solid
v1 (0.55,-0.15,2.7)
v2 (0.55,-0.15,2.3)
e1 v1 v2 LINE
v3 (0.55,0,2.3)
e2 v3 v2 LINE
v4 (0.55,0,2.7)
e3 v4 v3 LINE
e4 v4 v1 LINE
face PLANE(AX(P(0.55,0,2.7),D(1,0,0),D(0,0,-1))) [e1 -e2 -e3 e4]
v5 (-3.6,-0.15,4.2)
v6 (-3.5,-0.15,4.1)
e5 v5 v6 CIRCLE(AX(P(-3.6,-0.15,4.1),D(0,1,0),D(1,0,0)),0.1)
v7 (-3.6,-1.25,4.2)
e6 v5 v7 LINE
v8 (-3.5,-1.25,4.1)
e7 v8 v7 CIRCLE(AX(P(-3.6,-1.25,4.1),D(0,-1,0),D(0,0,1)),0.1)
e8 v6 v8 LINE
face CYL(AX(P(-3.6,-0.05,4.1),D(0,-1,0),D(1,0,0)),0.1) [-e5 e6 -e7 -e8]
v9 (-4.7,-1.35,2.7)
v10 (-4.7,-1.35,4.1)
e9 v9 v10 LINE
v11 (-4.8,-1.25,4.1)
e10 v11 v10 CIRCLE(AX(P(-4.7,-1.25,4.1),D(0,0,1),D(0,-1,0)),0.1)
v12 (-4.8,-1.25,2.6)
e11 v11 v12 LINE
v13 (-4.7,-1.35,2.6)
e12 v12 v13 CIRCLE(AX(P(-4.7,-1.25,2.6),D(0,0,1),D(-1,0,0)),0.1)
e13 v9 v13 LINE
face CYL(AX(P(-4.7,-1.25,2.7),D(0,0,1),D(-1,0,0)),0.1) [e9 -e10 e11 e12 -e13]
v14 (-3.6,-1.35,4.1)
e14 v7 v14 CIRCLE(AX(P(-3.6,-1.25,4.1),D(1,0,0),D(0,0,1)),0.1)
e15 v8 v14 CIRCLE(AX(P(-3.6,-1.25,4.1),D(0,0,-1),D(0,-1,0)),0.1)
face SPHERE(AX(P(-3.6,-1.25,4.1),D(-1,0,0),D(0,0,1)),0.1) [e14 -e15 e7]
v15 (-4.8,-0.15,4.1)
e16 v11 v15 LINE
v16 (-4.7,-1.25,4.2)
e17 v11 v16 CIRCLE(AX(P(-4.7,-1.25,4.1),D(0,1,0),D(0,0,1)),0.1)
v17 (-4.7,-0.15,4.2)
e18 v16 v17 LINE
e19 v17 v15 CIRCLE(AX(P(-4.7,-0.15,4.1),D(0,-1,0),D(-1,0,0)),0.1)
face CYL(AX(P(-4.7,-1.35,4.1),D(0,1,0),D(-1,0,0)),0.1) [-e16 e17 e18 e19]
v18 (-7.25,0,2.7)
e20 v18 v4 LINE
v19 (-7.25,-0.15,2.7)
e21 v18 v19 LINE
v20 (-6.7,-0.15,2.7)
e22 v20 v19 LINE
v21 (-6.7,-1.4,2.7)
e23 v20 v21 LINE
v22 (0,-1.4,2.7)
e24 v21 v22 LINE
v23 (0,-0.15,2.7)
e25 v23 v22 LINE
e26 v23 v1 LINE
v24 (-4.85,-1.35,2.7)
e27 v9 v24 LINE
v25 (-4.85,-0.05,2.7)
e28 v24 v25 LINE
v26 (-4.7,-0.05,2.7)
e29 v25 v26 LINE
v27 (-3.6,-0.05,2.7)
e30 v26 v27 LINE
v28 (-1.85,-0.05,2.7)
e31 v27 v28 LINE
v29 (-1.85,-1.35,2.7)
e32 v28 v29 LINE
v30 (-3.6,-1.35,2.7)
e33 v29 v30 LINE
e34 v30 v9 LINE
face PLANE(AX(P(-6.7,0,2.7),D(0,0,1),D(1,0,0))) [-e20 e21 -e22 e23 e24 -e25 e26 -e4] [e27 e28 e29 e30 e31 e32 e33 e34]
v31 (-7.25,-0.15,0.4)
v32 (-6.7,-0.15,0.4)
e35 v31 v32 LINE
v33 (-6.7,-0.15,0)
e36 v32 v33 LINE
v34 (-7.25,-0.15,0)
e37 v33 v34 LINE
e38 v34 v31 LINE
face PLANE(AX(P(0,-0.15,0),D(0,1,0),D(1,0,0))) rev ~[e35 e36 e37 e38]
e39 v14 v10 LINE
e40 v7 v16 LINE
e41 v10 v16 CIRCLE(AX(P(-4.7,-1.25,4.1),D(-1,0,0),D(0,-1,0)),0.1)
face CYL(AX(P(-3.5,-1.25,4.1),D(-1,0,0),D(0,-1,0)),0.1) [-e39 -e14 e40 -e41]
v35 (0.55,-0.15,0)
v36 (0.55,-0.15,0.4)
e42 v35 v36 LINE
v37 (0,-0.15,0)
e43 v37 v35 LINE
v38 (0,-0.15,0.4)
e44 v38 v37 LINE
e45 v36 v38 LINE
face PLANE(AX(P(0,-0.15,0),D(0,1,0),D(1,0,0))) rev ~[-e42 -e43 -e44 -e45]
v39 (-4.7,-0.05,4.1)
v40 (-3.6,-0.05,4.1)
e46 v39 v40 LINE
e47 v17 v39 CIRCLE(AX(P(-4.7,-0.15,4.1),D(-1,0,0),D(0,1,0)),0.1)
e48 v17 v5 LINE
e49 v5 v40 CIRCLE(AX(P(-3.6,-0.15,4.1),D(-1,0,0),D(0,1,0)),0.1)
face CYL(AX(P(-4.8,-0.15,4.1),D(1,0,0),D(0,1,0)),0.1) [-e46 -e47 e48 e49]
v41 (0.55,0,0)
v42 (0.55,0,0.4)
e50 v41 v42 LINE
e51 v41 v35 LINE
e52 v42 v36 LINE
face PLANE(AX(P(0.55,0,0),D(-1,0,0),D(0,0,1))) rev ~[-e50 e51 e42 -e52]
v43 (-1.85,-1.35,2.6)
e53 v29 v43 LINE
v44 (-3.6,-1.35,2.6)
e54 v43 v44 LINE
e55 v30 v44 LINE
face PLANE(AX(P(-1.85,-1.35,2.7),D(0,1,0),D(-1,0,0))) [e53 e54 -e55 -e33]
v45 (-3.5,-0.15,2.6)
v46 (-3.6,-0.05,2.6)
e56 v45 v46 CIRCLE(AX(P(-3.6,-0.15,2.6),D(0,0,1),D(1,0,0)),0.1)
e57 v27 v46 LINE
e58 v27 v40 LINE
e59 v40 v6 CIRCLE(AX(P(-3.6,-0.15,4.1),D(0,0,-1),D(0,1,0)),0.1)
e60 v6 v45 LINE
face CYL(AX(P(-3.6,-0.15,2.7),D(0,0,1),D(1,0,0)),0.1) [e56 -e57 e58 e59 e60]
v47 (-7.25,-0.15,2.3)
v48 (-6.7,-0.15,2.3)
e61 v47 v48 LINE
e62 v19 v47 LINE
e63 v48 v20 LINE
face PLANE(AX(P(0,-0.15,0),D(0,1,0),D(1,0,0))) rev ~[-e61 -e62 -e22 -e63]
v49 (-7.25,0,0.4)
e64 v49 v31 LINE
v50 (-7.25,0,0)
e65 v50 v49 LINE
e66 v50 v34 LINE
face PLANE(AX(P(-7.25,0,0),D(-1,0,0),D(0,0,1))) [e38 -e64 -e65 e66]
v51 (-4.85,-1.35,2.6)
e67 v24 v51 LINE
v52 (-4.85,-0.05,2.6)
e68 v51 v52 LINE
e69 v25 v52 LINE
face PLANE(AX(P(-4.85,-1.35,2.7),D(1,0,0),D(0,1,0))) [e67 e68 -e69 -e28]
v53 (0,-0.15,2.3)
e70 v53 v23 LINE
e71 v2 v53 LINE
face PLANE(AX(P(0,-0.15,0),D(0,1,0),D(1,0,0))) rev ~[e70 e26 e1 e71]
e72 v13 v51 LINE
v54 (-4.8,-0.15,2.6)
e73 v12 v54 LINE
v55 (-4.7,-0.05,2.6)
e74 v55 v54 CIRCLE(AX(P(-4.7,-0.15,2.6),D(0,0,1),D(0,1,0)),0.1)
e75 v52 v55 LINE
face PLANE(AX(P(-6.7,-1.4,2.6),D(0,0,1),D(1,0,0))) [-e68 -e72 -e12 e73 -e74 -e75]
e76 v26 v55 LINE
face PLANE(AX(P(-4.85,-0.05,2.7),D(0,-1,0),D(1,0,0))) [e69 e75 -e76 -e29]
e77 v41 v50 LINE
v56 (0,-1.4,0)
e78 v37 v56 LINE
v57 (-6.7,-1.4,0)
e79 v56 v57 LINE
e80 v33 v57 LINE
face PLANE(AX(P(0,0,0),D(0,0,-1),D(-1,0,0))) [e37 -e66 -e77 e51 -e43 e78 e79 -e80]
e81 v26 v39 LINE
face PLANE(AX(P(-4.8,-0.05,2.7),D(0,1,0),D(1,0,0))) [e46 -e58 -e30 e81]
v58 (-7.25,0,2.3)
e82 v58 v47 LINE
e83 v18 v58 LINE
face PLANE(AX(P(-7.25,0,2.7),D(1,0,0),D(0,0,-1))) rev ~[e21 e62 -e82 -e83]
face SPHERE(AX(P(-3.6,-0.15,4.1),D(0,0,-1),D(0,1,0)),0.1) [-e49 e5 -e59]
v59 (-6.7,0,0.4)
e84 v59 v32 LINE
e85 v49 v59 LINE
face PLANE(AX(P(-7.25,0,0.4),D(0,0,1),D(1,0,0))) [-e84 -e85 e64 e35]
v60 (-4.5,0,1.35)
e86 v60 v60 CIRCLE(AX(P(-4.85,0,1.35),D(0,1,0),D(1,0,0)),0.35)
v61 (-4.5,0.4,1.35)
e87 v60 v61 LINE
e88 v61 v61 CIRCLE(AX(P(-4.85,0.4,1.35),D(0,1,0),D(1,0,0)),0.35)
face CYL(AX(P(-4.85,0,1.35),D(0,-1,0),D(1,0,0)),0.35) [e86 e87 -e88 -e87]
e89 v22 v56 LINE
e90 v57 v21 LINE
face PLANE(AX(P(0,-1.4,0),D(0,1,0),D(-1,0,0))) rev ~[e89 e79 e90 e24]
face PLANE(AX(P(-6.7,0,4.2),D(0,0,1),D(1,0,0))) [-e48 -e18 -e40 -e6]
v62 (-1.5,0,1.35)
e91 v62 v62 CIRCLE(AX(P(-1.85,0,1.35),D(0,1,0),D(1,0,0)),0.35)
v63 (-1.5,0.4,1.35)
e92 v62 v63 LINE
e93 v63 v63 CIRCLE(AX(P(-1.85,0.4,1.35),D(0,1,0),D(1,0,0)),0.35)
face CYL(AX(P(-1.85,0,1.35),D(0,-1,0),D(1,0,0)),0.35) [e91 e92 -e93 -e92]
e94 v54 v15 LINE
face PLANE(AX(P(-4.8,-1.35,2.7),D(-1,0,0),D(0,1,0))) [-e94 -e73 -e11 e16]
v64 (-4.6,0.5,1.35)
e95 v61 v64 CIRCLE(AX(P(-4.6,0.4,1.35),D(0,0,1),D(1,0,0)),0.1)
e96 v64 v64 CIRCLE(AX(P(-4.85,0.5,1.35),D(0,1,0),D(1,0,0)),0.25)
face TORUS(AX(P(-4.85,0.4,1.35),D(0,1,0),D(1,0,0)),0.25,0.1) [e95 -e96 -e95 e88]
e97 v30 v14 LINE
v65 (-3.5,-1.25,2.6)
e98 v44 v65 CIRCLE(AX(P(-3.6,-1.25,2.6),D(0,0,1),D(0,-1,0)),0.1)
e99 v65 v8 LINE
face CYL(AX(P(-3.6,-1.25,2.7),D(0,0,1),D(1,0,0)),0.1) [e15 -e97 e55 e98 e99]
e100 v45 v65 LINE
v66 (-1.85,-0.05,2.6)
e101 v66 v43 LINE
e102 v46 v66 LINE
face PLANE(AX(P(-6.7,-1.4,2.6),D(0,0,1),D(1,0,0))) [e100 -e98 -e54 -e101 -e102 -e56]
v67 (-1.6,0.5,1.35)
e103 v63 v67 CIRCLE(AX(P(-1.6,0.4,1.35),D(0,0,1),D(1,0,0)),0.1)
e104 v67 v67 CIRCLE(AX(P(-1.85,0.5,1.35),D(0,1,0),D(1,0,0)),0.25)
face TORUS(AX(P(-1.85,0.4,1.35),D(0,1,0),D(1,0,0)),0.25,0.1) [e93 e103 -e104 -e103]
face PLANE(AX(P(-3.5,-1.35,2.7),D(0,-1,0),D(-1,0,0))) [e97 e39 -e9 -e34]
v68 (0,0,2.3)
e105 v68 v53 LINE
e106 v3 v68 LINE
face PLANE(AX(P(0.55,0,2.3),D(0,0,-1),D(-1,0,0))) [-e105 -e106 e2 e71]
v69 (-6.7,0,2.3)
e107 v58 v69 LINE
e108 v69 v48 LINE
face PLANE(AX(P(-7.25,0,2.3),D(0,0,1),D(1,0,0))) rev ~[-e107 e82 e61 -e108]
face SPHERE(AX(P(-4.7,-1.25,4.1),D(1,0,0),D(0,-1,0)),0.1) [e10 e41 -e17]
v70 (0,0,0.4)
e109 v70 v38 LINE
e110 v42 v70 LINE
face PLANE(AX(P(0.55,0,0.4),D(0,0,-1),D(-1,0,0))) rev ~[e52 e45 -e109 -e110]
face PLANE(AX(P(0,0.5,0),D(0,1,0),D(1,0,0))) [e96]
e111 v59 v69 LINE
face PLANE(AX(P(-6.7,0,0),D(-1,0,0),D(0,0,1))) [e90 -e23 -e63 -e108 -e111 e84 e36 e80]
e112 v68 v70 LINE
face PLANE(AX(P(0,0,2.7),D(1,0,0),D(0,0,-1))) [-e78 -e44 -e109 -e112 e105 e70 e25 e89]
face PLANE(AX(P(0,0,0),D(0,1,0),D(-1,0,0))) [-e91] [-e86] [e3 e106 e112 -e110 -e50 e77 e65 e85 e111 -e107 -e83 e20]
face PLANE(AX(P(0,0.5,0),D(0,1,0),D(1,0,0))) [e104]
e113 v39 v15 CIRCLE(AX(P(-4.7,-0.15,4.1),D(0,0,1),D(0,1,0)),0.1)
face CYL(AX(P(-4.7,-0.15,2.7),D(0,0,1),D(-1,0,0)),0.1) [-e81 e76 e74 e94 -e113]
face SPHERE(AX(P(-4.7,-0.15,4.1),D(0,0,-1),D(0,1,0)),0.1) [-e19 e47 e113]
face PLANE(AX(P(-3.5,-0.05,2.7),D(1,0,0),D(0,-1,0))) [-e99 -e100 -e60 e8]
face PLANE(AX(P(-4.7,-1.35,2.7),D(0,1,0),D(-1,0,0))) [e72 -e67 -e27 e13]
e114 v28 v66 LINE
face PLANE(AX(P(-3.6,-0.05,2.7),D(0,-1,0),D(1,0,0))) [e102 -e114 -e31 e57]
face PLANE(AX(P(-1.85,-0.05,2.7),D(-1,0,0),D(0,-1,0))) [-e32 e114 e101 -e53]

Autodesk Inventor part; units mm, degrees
ref_plane "YZ Plane" through (0, 0, 0) normal (1, 0, 0) x (0, 1, 0)
ref_plane "XZ Plane" through (0, 0, 0) normal (0, 1, 0) x (-1, 0, 0)
ref_plane "XY Plane" through (0, 0, 0) normal (0, 0, 1) x (1, 0, 0)
sketch "Эскиз1" plane through (0, 0, 0) normal (0, 1, 0) x (-1, 0, 0)
  line L0 (0, 0) -> (6.7, 0)
  line L1 (6.7, 0) -> (6.7, 2.7)
  line L2 (6.7, 2.7) -> (0, 2.7)
  line L3 (0, 2.7) -> (0, 0)
  dimension "d0" = 6.7
  dimension "d1" = 2.7
extrude "Выдавливание1" add sketch "Эскиз1" against normal blind 1.4
sketch "Эскиз2" plane through (0, 0, 0) normal (0, 1, 0) x (1, 0, 0)
  line L0 (0, 0) -> (-6.7, 0) projected
  circle A0 centre (-4.85, -1.35) radius 0.35
  circle A1 centre (-1.85, -1.35) radius 0.35
  point P0 (0, -2.7)
  dimension "d4" = 0.7
  dimension "d6" = 1.35
  dimension "d7" = 2.7
  dimension "d9" = 1.35
  dimension "d10" = 3
  dimension "d11" = 1.85
  dimension "d12" = 6.7
extrude "Выдавливание2" add sketch "Эскиз2" along normal blind 0.5
sketch "Эскиз3" plane through (-6.7, 0, 2.7) normal (0, 0, 1) x (1, 0, 0)
  line L0 (0, 0) -> (6.7, 0) projected
  line L1 (1.9, -0.05) -> (3.2, -0.05)
  line L2 (3.2, -0.05) -> (3.2, -1.35)
  line L3 (3.2, -1.35) -> (1.9, -1.35)
  line L4 (1.9, -1.35) -> (1.9, -0.05)
  line L5 (1.85, -0.05) -> (4.85, -0.05)
  line L6 (4.85, -0.05) -> (4.85, -1.35)
  line L7 (4.85, -1.35) -> (1.85, -1.35)
  line L8 (1.85, -1.35) -> (1.85, -0.05)
  line L9 (3.5, -0.05) -> (4.8, -0.05)
  line L10 (4.8, -0.05) -> (4.8, -1.35)
  line L11 (4.8, -1.35) -> (3.5, -1.35)
  line L12 (3.5, -1.35) -> (3.5, -0.05)
  point P0 (0, -1.4)
  point P1 (6.7, -1.4)
  dimension "d15" = 1.3
  dimension "d16" = 1.3
  dimension "d18" = 0.05
  dimension "d20" = 3
  dimension "d21" = 1.3
  dimension "d22" = 1.85
  dimension "d23" = 6.7
  dimension "d24" = 0.05
  dimension "d25" = 0.05
  dimension "d51" = 1.3
  dimension "d52" = 1.3
  dimension "d53" = 0.05
extrude "Выдавливание3" add sketch "Эскиз3" along normal blind 1.5 contours L1 L2 L3 L4
sketch "Эскиз4" plane through (0, 0, 0) normal (0, 1, 0) x (1, 0, 0)
  line L0 (0, 0) -> (0.55, 0)
  line L1 (0.55, 0) -> (0.55, -0.4)
  line L2 (0.55, -0.4) -> (0, -0.4)
  line L3 (0, -0.4) -> (0, 0)
  line L4 (0, -2.7) -> (0.55, -2.7)
  line L5 (0.55, -2.7) -> (0.55, -2.3)
  line L6 (0.55, -2.3) -> (0, -2.3)
  line L7 (0, -2.3) -> (0, -2.7)
  line L8 (-6.7, -2.7) -> (-7.25, -2.7)
  line L9 (-7.25, -2.7) -> (-7.25, -2.3)
  line L10 (-7.25, -2.3) -> (-6.7, -2.3)
  line L11 (-6.7, -2.3) -> (-6.7, -2.7)
  line L12 (-6.7, 0) -> (-7.25, 0)
  line L13 (-7.25, 0) -> (-7.25, -0.4)
  line L14 (-7.25, -0.4) -> (-6.7, -0.4)
  line L15 (-6.7, -0.4) -> (-6.7, 0)
  dimension "d28" = 0.55
  dimension "d29" = 0.4
  dimension "d30" = 0.4
  dimension "d31" = 0.55
  dimension "d32" = 0.4
  dimension "d33" = 0.4
extrude "Выдавливание4" add sketch "Эскиз4" against normal blind 0.15
fillet "Сопряжение1" radius 0.1 2 edges at (-5.2, 0.5, 1.35) (-2.2, 0.5, 1.35)
fillet "Сопряжение2" radius 0.1 8 edges at (-4.8, -0.05, 3.45) (-3.5, -0.05, 3.45) (-4.15, -0.05, 4.2) (-4.15, -1.35, 4.2) (-3.5, -0.7, 4.2) (-3.5, -1.35, 3.45) (-4.8, -1.35, 3.45) (-4.8, -0.7, 4.2)
fillet "Сопряжение2" radius 0.1 2 edges at (-4.15, -0.05, 4.2) (-4.15, -1.35, 4.2)
sketch "Эскиз6" plane through (-6.7, -1.4, 2.7) normal (0, 0, 1) x (1, 0, 0)
  line L0 (3.2, 1.25) -> (3.2, 0.15) projected
  arc A0 (3.1, 0.05) -> (3.2, 0.15) centre (3.1, 0.15) ccw projected
  arc A1 (1.9, 0.15) -> (2, 0.05) centre (2, 0.15) ccw projected
  line L1 (1.9, 0.15) -> (1.9, 1.25) projected
  arc A2 (2, 1.35) -> (1.9, 1.25) centre (2, 1.25) ccw projected
  arc A3 (3.2, 1.25) -> (3.1, 1.35) centre (3.1, 1.25) ccw projected
  line L2 (0, 0) -> (6.7, 0)
  line L3 (1.85, 1.35) -> (4.85, 1.35) projected
  line L4 (4.85, 1.35) -> (4.85, 0.05) projected
  line L5 (1.85, 0.05) -> (1.85, 1.35) projected
  line L6 (4.85, 0.05) -> (1.85, 0.05) projected
extrude "Выдавливание5" cut sketch "Эскиз6" against normal blind 0.1 contours A3 L3 L4 L6 A0 L0 | A2 L1 A1 L6 L5 L3
sketch "Эскиз7" plane through (0, 0, 0) normal (0, 1, 0) x (1, 0, 0)
  circle A0 centre (-4.85, -1.35) radius 0.35 projected
  circle A1 centre (-1.85, -1.35) radius 0.35 projected
  line L0 (0.55, 0) -> (-7.25, 0) projected
  line L1 (-7.25, 0) -> (-7.25, -0.4) projected
  line L2 (-7.25, -0.4) -> (-6.7, -0.4) projected
  line L3 (-6.7, -0.4) -> (-6.7, -2.3) projected
  line L4 (-6.7, -2.3) -> (-7.25, -2.3) projected
  line L5 (-7.25, -2.3) -> (-7.25, -2.7) projected
  line L6 (-7.25, -2.7) -> (0.55, -2.7) projected
  line L7 (0.55, -2.7) -> (0.55, -2.3) projected
  line L8 (0.55, -2.3) -> (0, -2.3) projected
  line L9 (0, -2.3) -> (0, -0.4) projected
  line L10 (0, -0.4) -> (0.55, -0.4) projected
  line L11 (0.55, -0.4) -> (0.55, 0) projected
  point P0 (0, 0)
  dimension "d49" = 1.35
  dimension "d50" = 3
sketch "Эскиз8" plane through (-6.7, -1.4, 2.7) normal (0, 0, 1) x (1, 0, 0)
  line L0 (1.85, 1.35) -> (2, 1.35) projected
  line L1 (2, 1.35) -> (3.1, 1.35) projected
  line L2 (3.1, 1.35) -> (2, 1.35) projected
  line L3 (3.6, 1.35) -> (4.7, 1.35) projected
  line L4 (1.85, 1.35) -> (4.85, 1.35) projected
  line L5 (4.85, 1.35) -> (4.85, 0.05) projected
  line L6 (4.85, 0.05) -> (3.1, 0.05) projected
  line L7 (4.7, 0.05) -> (3.6, 0.05) projected
  line L8 (4.85, 0.05) -> (3.1, 0.05) projected
  line L9 (3.1, 0.05) -> (2, 0.05) projected
  line L10 (2, 0.05) -> (1.85, 0.05) projected
  line L11 (1.85, 0.05) -> (1.85, 1.35) projected
equation "\"d6\" = 0.5 * d7"
equation "\"d9\" = d6"
equation "\"d11\" = -0.5 * d10 + 0.5 * d12"
equation "\"d22\" = -0.5 * d20 + 0.5 * d23"
properties part number "msk12c02"
